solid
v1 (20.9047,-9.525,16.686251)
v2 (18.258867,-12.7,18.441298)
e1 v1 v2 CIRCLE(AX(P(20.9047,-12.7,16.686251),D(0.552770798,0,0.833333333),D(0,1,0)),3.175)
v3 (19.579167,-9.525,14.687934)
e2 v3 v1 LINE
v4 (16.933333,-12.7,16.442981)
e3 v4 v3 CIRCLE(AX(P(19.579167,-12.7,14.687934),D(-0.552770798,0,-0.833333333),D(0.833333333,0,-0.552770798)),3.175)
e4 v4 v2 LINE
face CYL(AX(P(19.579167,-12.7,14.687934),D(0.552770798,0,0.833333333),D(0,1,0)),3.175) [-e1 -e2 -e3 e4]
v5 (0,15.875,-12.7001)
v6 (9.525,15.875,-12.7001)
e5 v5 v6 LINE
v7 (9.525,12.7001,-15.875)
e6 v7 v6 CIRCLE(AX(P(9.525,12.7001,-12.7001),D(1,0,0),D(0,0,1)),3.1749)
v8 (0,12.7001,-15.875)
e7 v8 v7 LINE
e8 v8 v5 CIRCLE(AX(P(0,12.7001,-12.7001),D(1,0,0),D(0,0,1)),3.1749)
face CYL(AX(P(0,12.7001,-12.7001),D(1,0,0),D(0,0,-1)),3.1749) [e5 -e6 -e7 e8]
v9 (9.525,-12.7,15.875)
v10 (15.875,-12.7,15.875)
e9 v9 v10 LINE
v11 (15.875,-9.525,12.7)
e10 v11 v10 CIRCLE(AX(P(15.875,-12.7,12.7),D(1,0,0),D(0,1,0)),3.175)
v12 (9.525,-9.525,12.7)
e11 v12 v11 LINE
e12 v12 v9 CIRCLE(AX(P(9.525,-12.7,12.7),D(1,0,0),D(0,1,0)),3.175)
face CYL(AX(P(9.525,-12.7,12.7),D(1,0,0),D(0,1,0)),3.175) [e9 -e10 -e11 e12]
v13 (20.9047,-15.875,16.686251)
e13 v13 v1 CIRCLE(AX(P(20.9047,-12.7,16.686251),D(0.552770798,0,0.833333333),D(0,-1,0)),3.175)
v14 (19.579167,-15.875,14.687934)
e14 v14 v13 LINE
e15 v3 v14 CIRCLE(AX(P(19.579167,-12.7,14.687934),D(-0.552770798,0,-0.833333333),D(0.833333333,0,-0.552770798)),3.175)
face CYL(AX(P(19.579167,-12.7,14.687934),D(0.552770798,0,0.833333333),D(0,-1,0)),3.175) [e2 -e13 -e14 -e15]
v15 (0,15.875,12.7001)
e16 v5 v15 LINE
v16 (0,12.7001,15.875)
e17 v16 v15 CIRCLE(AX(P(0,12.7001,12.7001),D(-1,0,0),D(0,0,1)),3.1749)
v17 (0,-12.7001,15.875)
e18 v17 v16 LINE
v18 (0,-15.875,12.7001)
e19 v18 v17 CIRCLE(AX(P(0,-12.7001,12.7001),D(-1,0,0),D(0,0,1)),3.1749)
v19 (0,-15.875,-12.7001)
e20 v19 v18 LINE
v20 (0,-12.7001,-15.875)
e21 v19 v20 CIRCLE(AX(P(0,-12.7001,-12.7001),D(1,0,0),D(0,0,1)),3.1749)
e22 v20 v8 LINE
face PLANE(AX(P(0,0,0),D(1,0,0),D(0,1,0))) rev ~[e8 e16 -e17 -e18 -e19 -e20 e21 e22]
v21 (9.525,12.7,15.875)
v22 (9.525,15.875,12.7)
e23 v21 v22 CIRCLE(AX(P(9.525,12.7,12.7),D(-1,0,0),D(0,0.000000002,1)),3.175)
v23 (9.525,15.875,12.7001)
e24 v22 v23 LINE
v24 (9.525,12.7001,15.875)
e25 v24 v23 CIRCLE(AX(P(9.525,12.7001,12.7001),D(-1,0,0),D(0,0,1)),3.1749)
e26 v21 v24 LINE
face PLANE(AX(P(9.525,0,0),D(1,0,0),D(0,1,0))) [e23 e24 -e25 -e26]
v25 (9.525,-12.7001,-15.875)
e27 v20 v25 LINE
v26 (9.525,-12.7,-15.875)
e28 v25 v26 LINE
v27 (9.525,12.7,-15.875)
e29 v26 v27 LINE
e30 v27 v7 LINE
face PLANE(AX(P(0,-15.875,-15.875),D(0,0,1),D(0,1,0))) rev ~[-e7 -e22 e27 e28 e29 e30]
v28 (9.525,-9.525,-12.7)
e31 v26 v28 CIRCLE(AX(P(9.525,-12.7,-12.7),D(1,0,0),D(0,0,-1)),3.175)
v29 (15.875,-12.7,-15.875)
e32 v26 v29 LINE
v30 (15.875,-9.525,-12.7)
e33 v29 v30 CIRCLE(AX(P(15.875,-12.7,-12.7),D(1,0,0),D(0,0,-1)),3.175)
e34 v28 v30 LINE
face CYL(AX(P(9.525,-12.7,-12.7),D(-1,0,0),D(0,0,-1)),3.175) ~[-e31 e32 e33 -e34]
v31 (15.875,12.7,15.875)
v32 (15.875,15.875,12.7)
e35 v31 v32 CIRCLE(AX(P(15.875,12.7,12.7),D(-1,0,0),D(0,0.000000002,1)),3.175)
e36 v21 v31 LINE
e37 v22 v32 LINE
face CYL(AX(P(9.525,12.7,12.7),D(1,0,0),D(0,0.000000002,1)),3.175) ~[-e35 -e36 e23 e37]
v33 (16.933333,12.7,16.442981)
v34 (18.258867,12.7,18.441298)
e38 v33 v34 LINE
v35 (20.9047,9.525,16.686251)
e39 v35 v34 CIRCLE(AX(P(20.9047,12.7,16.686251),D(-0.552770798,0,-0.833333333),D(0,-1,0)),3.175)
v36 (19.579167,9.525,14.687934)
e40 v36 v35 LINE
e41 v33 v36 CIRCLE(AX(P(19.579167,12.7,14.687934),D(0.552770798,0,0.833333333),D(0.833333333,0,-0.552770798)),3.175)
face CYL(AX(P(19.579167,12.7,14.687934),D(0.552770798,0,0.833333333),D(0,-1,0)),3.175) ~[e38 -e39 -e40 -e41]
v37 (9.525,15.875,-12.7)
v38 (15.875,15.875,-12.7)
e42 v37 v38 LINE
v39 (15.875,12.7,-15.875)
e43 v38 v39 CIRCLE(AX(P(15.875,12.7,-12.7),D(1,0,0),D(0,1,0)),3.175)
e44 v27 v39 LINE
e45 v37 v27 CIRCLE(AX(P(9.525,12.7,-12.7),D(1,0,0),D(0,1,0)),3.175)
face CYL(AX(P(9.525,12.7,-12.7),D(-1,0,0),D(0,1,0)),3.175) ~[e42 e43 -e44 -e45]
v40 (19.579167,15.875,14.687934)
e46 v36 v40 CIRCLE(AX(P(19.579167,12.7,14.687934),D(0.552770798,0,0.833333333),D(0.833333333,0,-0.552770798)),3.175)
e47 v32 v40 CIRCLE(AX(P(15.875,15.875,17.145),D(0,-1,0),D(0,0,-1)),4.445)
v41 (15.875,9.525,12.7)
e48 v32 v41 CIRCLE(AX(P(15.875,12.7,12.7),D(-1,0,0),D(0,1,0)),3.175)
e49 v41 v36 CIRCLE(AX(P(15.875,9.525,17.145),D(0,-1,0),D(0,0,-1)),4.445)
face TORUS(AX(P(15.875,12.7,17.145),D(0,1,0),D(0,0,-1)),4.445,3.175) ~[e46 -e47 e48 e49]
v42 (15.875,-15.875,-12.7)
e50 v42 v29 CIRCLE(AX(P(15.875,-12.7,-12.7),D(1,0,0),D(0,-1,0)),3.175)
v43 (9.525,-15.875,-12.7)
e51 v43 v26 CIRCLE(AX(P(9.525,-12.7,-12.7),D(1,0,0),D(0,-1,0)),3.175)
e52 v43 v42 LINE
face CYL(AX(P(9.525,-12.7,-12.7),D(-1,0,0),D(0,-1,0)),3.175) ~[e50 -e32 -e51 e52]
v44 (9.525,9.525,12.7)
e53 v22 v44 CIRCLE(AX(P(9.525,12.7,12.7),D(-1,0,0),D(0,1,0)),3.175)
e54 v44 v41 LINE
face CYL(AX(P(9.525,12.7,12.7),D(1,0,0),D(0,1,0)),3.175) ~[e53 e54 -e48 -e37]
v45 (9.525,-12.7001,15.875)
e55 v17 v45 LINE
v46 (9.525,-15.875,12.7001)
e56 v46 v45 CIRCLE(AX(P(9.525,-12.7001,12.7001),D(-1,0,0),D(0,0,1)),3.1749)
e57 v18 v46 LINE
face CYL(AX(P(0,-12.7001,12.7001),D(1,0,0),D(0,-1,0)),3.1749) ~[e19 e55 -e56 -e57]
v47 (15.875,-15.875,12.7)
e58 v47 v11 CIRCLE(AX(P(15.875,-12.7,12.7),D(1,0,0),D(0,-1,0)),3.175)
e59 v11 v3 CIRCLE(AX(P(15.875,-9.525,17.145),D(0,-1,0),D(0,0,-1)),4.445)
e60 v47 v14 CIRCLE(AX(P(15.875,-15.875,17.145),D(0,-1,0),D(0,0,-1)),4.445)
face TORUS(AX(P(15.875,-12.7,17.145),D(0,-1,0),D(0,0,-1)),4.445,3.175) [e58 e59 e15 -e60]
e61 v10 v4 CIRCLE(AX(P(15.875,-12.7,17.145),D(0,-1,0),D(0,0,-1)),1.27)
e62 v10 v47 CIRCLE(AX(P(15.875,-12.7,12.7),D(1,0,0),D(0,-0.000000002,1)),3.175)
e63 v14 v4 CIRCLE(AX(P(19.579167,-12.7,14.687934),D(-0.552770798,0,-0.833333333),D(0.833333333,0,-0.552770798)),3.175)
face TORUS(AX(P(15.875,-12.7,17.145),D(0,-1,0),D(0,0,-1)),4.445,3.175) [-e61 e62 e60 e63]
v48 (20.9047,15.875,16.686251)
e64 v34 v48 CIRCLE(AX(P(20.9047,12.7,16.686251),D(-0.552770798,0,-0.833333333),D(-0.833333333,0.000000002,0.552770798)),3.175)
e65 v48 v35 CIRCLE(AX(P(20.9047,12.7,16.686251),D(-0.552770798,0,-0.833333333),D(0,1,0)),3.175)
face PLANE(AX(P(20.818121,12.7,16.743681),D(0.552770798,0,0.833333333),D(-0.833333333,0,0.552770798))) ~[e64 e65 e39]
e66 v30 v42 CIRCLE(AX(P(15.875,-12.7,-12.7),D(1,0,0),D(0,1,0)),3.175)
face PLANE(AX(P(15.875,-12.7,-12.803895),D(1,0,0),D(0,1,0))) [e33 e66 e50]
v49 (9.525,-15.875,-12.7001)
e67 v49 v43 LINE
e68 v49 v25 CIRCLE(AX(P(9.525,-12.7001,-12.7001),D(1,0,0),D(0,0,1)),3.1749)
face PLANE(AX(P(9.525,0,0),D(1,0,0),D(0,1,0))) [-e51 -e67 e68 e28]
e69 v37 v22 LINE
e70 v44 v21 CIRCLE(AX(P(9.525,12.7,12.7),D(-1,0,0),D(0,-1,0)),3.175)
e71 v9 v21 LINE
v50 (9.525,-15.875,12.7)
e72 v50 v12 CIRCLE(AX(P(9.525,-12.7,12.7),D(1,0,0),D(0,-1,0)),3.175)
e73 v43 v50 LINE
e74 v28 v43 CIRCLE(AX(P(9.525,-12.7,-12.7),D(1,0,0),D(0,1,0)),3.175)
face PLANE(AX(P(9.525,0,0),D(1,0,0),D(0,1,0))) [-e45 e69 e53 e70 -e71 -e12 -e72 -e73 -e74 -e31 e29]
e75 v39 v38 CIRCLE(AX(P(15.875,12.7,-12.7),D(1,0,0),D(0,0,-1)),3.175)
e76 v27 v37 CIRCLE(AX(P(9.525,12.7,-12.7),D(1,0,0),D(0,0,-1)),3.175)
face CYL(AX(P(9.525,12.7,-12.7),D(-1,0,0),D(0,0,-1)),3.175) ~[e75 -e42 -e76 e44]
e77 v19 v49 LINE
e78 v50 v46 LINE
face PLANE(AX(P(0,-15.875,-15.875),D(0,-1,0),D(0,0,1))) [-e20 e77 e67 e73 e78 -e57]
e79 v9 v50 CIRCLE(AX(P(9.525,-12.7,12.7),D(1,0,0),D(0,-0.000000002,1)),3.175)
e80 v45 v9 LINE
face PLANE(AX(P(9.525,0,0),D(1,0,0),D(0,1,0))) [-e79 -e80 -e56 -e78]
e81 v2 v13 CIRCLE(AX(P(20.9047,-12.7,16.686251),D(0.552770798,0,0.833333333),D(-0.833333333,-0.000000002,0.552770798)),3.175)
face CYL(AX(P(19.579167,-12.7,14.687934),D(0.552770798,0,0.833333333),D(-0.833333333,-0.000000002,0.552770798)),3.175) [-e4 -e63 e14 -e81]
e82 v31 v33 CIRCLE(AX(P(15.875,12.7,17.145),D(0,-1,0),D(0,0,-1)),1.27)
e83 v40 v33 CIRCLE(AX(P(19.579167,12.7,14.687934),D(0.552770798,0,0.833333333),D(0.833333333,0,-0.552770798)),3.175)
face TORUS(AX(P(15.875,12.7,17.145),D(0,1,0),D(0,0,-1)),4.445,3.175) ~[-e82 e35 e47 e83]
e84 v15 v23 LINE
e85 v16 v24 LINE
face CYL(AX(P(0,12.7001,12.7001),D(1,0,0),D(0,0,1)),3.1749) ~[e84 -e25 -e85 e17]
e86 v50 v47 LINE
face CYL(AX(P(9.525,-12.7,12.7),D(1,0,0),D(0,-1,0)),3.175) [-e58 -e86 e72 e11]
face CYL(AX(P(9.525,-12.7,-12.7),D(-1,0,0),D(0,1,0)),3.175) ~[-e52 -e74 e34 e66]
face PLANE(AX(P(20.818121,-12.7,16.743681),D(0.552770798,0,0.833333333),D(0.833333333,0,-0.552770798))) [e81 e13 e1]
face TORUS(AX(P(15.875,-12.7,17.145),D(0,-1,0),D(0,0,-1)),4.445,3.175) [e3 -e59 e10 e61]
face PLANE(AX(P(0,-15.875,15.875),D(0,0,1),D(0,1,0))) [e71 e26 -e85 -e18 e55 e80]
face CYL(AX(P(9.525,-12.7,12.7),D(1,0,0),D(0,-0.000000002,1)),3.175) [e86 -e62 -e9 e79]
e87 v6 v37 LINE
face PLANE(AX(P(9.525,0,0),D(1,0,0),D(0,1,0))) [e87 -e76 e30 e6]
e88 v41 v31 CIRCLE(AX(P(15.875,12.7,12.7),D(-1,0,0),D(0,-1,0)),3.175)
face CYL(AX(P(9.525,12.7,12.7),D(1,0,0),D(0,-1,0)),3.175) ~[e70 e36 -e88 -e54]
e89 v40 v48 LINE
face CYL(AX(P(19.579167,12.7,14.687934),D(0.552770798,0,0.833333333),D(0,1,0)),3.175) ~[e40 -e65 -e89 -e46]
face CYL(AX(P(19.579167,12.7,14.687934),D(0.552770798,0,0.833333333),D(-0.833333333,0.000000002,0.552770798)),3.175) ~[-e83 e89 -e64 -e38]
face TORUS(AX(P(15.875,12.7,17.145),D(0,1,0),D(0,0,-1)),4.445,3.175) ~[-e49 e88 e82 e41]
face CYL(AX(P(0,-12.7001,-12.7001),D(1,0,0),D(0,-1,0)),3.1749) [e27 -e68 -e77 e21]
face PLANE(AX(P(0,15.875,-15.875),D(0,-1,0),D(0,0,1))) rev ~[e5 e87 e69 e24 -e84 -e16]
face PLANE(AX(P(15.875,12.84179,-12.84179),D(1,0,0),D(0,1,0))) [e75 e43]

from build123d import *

# Parameters (mm, degrees)
F0_W      = 31.75
F0_H      = 31.75
F1_DEPTH  = 9.525
F10_DEPTH = 6.35
F11_R     = 3.1749


# Not quite as in the source:
# - a fillet or chamfer is up to 0.001 mm smaller than in the source, because OpenCascade refuses the exact size


with BuildPart() as f1:
    # F0 (on Right) → F1 (new body)
    with BuildSketch(Plane.YZ):
        Rectangle(F0_W, F0_H)
    extrude(amount=F1_DEPTH)

    # F6: sweep along a path in F5
    with BuildLine(Plane.XZ.offset(12.7)) as f6_path:
        Line((9.525, 9.525), (15.875, 9.525))
        ThreePointArc((15.875, 9.525), (19.4783384003, 10.4308096264), (22.225, 12.9328865162))
        Line((22.225, 12.9328865162), (23.5505334947, 14.9312034475))
    # F2 (on face) → F6 (sweep)
    with BuildSketch(Plane.YZ.offset(9.525)):
        with BuildLine():
            ThreePointArc((-15.875, 12.7), (-12.7, 9.525), (-9.525, 12.7))
            ThreePointArc((-9.525, 12.7), (-10.4549359718, 14.9450640323), (-12.7000000057, 15.875))
            ThreePointArc((-12.7000000057, 15.875), (-14.9450640323, 14.9450640282), (-15.875, 12.7))
        make_face()
    sweep(path=f6_path.line)

    # F9: F1 across plane


with BuildPart() as f1_1:
    add(f1.part)
    add(f1.part.mirror(Plane(origin=(0, 0, 15.875), x_dir=(1, 0, 0), z_dir=(0, -1, 0))))

    # F2 (on face) → F10 (join)
    with BuildSketch(Plane.YZ.offset(9.525)):
        with BuildLine():
            ThreePointArc((-9.525, -12.7), (-12.7, -9.525), (-15.875, -12.7))
            ThreePointArc((-15.875, -12.7), (-14.9450640303, -14.9450640303), (-12.7, -15.875))
            ThreePointArc((-12.7, -15.875), (-10.4549359697, -14.9450640303), (-9.525, -12.7))
        make_face()
        with BuildLine():
            ThreePointArc((12.7, -15.875), (14.9450640303, -14.9450640303), (15.875, -12.7))
            ThreePointArc((15.875, -12.7), (10.4549359697, -10.4549359697), (12.7, -15.875))
        make_face()
    extrude(amount=F10_DEPTH)

    # F11 (radius 3.175 in the source; OpenCascade refuses exactly that, so slightly less here)
    f11_edges = [f1_1.edges().sort_by_distance(p)[0] for p in [
        (4.7625, -15.875, 15.875),
        (4.7625, -15.875, -15.875),
        (4.7625, 15.875, -15.875),
        (4.7625, 15.875, 15.875),
    ]]
    fillet(f11_edges, radius=F11_R)


solid = f1_1.part
